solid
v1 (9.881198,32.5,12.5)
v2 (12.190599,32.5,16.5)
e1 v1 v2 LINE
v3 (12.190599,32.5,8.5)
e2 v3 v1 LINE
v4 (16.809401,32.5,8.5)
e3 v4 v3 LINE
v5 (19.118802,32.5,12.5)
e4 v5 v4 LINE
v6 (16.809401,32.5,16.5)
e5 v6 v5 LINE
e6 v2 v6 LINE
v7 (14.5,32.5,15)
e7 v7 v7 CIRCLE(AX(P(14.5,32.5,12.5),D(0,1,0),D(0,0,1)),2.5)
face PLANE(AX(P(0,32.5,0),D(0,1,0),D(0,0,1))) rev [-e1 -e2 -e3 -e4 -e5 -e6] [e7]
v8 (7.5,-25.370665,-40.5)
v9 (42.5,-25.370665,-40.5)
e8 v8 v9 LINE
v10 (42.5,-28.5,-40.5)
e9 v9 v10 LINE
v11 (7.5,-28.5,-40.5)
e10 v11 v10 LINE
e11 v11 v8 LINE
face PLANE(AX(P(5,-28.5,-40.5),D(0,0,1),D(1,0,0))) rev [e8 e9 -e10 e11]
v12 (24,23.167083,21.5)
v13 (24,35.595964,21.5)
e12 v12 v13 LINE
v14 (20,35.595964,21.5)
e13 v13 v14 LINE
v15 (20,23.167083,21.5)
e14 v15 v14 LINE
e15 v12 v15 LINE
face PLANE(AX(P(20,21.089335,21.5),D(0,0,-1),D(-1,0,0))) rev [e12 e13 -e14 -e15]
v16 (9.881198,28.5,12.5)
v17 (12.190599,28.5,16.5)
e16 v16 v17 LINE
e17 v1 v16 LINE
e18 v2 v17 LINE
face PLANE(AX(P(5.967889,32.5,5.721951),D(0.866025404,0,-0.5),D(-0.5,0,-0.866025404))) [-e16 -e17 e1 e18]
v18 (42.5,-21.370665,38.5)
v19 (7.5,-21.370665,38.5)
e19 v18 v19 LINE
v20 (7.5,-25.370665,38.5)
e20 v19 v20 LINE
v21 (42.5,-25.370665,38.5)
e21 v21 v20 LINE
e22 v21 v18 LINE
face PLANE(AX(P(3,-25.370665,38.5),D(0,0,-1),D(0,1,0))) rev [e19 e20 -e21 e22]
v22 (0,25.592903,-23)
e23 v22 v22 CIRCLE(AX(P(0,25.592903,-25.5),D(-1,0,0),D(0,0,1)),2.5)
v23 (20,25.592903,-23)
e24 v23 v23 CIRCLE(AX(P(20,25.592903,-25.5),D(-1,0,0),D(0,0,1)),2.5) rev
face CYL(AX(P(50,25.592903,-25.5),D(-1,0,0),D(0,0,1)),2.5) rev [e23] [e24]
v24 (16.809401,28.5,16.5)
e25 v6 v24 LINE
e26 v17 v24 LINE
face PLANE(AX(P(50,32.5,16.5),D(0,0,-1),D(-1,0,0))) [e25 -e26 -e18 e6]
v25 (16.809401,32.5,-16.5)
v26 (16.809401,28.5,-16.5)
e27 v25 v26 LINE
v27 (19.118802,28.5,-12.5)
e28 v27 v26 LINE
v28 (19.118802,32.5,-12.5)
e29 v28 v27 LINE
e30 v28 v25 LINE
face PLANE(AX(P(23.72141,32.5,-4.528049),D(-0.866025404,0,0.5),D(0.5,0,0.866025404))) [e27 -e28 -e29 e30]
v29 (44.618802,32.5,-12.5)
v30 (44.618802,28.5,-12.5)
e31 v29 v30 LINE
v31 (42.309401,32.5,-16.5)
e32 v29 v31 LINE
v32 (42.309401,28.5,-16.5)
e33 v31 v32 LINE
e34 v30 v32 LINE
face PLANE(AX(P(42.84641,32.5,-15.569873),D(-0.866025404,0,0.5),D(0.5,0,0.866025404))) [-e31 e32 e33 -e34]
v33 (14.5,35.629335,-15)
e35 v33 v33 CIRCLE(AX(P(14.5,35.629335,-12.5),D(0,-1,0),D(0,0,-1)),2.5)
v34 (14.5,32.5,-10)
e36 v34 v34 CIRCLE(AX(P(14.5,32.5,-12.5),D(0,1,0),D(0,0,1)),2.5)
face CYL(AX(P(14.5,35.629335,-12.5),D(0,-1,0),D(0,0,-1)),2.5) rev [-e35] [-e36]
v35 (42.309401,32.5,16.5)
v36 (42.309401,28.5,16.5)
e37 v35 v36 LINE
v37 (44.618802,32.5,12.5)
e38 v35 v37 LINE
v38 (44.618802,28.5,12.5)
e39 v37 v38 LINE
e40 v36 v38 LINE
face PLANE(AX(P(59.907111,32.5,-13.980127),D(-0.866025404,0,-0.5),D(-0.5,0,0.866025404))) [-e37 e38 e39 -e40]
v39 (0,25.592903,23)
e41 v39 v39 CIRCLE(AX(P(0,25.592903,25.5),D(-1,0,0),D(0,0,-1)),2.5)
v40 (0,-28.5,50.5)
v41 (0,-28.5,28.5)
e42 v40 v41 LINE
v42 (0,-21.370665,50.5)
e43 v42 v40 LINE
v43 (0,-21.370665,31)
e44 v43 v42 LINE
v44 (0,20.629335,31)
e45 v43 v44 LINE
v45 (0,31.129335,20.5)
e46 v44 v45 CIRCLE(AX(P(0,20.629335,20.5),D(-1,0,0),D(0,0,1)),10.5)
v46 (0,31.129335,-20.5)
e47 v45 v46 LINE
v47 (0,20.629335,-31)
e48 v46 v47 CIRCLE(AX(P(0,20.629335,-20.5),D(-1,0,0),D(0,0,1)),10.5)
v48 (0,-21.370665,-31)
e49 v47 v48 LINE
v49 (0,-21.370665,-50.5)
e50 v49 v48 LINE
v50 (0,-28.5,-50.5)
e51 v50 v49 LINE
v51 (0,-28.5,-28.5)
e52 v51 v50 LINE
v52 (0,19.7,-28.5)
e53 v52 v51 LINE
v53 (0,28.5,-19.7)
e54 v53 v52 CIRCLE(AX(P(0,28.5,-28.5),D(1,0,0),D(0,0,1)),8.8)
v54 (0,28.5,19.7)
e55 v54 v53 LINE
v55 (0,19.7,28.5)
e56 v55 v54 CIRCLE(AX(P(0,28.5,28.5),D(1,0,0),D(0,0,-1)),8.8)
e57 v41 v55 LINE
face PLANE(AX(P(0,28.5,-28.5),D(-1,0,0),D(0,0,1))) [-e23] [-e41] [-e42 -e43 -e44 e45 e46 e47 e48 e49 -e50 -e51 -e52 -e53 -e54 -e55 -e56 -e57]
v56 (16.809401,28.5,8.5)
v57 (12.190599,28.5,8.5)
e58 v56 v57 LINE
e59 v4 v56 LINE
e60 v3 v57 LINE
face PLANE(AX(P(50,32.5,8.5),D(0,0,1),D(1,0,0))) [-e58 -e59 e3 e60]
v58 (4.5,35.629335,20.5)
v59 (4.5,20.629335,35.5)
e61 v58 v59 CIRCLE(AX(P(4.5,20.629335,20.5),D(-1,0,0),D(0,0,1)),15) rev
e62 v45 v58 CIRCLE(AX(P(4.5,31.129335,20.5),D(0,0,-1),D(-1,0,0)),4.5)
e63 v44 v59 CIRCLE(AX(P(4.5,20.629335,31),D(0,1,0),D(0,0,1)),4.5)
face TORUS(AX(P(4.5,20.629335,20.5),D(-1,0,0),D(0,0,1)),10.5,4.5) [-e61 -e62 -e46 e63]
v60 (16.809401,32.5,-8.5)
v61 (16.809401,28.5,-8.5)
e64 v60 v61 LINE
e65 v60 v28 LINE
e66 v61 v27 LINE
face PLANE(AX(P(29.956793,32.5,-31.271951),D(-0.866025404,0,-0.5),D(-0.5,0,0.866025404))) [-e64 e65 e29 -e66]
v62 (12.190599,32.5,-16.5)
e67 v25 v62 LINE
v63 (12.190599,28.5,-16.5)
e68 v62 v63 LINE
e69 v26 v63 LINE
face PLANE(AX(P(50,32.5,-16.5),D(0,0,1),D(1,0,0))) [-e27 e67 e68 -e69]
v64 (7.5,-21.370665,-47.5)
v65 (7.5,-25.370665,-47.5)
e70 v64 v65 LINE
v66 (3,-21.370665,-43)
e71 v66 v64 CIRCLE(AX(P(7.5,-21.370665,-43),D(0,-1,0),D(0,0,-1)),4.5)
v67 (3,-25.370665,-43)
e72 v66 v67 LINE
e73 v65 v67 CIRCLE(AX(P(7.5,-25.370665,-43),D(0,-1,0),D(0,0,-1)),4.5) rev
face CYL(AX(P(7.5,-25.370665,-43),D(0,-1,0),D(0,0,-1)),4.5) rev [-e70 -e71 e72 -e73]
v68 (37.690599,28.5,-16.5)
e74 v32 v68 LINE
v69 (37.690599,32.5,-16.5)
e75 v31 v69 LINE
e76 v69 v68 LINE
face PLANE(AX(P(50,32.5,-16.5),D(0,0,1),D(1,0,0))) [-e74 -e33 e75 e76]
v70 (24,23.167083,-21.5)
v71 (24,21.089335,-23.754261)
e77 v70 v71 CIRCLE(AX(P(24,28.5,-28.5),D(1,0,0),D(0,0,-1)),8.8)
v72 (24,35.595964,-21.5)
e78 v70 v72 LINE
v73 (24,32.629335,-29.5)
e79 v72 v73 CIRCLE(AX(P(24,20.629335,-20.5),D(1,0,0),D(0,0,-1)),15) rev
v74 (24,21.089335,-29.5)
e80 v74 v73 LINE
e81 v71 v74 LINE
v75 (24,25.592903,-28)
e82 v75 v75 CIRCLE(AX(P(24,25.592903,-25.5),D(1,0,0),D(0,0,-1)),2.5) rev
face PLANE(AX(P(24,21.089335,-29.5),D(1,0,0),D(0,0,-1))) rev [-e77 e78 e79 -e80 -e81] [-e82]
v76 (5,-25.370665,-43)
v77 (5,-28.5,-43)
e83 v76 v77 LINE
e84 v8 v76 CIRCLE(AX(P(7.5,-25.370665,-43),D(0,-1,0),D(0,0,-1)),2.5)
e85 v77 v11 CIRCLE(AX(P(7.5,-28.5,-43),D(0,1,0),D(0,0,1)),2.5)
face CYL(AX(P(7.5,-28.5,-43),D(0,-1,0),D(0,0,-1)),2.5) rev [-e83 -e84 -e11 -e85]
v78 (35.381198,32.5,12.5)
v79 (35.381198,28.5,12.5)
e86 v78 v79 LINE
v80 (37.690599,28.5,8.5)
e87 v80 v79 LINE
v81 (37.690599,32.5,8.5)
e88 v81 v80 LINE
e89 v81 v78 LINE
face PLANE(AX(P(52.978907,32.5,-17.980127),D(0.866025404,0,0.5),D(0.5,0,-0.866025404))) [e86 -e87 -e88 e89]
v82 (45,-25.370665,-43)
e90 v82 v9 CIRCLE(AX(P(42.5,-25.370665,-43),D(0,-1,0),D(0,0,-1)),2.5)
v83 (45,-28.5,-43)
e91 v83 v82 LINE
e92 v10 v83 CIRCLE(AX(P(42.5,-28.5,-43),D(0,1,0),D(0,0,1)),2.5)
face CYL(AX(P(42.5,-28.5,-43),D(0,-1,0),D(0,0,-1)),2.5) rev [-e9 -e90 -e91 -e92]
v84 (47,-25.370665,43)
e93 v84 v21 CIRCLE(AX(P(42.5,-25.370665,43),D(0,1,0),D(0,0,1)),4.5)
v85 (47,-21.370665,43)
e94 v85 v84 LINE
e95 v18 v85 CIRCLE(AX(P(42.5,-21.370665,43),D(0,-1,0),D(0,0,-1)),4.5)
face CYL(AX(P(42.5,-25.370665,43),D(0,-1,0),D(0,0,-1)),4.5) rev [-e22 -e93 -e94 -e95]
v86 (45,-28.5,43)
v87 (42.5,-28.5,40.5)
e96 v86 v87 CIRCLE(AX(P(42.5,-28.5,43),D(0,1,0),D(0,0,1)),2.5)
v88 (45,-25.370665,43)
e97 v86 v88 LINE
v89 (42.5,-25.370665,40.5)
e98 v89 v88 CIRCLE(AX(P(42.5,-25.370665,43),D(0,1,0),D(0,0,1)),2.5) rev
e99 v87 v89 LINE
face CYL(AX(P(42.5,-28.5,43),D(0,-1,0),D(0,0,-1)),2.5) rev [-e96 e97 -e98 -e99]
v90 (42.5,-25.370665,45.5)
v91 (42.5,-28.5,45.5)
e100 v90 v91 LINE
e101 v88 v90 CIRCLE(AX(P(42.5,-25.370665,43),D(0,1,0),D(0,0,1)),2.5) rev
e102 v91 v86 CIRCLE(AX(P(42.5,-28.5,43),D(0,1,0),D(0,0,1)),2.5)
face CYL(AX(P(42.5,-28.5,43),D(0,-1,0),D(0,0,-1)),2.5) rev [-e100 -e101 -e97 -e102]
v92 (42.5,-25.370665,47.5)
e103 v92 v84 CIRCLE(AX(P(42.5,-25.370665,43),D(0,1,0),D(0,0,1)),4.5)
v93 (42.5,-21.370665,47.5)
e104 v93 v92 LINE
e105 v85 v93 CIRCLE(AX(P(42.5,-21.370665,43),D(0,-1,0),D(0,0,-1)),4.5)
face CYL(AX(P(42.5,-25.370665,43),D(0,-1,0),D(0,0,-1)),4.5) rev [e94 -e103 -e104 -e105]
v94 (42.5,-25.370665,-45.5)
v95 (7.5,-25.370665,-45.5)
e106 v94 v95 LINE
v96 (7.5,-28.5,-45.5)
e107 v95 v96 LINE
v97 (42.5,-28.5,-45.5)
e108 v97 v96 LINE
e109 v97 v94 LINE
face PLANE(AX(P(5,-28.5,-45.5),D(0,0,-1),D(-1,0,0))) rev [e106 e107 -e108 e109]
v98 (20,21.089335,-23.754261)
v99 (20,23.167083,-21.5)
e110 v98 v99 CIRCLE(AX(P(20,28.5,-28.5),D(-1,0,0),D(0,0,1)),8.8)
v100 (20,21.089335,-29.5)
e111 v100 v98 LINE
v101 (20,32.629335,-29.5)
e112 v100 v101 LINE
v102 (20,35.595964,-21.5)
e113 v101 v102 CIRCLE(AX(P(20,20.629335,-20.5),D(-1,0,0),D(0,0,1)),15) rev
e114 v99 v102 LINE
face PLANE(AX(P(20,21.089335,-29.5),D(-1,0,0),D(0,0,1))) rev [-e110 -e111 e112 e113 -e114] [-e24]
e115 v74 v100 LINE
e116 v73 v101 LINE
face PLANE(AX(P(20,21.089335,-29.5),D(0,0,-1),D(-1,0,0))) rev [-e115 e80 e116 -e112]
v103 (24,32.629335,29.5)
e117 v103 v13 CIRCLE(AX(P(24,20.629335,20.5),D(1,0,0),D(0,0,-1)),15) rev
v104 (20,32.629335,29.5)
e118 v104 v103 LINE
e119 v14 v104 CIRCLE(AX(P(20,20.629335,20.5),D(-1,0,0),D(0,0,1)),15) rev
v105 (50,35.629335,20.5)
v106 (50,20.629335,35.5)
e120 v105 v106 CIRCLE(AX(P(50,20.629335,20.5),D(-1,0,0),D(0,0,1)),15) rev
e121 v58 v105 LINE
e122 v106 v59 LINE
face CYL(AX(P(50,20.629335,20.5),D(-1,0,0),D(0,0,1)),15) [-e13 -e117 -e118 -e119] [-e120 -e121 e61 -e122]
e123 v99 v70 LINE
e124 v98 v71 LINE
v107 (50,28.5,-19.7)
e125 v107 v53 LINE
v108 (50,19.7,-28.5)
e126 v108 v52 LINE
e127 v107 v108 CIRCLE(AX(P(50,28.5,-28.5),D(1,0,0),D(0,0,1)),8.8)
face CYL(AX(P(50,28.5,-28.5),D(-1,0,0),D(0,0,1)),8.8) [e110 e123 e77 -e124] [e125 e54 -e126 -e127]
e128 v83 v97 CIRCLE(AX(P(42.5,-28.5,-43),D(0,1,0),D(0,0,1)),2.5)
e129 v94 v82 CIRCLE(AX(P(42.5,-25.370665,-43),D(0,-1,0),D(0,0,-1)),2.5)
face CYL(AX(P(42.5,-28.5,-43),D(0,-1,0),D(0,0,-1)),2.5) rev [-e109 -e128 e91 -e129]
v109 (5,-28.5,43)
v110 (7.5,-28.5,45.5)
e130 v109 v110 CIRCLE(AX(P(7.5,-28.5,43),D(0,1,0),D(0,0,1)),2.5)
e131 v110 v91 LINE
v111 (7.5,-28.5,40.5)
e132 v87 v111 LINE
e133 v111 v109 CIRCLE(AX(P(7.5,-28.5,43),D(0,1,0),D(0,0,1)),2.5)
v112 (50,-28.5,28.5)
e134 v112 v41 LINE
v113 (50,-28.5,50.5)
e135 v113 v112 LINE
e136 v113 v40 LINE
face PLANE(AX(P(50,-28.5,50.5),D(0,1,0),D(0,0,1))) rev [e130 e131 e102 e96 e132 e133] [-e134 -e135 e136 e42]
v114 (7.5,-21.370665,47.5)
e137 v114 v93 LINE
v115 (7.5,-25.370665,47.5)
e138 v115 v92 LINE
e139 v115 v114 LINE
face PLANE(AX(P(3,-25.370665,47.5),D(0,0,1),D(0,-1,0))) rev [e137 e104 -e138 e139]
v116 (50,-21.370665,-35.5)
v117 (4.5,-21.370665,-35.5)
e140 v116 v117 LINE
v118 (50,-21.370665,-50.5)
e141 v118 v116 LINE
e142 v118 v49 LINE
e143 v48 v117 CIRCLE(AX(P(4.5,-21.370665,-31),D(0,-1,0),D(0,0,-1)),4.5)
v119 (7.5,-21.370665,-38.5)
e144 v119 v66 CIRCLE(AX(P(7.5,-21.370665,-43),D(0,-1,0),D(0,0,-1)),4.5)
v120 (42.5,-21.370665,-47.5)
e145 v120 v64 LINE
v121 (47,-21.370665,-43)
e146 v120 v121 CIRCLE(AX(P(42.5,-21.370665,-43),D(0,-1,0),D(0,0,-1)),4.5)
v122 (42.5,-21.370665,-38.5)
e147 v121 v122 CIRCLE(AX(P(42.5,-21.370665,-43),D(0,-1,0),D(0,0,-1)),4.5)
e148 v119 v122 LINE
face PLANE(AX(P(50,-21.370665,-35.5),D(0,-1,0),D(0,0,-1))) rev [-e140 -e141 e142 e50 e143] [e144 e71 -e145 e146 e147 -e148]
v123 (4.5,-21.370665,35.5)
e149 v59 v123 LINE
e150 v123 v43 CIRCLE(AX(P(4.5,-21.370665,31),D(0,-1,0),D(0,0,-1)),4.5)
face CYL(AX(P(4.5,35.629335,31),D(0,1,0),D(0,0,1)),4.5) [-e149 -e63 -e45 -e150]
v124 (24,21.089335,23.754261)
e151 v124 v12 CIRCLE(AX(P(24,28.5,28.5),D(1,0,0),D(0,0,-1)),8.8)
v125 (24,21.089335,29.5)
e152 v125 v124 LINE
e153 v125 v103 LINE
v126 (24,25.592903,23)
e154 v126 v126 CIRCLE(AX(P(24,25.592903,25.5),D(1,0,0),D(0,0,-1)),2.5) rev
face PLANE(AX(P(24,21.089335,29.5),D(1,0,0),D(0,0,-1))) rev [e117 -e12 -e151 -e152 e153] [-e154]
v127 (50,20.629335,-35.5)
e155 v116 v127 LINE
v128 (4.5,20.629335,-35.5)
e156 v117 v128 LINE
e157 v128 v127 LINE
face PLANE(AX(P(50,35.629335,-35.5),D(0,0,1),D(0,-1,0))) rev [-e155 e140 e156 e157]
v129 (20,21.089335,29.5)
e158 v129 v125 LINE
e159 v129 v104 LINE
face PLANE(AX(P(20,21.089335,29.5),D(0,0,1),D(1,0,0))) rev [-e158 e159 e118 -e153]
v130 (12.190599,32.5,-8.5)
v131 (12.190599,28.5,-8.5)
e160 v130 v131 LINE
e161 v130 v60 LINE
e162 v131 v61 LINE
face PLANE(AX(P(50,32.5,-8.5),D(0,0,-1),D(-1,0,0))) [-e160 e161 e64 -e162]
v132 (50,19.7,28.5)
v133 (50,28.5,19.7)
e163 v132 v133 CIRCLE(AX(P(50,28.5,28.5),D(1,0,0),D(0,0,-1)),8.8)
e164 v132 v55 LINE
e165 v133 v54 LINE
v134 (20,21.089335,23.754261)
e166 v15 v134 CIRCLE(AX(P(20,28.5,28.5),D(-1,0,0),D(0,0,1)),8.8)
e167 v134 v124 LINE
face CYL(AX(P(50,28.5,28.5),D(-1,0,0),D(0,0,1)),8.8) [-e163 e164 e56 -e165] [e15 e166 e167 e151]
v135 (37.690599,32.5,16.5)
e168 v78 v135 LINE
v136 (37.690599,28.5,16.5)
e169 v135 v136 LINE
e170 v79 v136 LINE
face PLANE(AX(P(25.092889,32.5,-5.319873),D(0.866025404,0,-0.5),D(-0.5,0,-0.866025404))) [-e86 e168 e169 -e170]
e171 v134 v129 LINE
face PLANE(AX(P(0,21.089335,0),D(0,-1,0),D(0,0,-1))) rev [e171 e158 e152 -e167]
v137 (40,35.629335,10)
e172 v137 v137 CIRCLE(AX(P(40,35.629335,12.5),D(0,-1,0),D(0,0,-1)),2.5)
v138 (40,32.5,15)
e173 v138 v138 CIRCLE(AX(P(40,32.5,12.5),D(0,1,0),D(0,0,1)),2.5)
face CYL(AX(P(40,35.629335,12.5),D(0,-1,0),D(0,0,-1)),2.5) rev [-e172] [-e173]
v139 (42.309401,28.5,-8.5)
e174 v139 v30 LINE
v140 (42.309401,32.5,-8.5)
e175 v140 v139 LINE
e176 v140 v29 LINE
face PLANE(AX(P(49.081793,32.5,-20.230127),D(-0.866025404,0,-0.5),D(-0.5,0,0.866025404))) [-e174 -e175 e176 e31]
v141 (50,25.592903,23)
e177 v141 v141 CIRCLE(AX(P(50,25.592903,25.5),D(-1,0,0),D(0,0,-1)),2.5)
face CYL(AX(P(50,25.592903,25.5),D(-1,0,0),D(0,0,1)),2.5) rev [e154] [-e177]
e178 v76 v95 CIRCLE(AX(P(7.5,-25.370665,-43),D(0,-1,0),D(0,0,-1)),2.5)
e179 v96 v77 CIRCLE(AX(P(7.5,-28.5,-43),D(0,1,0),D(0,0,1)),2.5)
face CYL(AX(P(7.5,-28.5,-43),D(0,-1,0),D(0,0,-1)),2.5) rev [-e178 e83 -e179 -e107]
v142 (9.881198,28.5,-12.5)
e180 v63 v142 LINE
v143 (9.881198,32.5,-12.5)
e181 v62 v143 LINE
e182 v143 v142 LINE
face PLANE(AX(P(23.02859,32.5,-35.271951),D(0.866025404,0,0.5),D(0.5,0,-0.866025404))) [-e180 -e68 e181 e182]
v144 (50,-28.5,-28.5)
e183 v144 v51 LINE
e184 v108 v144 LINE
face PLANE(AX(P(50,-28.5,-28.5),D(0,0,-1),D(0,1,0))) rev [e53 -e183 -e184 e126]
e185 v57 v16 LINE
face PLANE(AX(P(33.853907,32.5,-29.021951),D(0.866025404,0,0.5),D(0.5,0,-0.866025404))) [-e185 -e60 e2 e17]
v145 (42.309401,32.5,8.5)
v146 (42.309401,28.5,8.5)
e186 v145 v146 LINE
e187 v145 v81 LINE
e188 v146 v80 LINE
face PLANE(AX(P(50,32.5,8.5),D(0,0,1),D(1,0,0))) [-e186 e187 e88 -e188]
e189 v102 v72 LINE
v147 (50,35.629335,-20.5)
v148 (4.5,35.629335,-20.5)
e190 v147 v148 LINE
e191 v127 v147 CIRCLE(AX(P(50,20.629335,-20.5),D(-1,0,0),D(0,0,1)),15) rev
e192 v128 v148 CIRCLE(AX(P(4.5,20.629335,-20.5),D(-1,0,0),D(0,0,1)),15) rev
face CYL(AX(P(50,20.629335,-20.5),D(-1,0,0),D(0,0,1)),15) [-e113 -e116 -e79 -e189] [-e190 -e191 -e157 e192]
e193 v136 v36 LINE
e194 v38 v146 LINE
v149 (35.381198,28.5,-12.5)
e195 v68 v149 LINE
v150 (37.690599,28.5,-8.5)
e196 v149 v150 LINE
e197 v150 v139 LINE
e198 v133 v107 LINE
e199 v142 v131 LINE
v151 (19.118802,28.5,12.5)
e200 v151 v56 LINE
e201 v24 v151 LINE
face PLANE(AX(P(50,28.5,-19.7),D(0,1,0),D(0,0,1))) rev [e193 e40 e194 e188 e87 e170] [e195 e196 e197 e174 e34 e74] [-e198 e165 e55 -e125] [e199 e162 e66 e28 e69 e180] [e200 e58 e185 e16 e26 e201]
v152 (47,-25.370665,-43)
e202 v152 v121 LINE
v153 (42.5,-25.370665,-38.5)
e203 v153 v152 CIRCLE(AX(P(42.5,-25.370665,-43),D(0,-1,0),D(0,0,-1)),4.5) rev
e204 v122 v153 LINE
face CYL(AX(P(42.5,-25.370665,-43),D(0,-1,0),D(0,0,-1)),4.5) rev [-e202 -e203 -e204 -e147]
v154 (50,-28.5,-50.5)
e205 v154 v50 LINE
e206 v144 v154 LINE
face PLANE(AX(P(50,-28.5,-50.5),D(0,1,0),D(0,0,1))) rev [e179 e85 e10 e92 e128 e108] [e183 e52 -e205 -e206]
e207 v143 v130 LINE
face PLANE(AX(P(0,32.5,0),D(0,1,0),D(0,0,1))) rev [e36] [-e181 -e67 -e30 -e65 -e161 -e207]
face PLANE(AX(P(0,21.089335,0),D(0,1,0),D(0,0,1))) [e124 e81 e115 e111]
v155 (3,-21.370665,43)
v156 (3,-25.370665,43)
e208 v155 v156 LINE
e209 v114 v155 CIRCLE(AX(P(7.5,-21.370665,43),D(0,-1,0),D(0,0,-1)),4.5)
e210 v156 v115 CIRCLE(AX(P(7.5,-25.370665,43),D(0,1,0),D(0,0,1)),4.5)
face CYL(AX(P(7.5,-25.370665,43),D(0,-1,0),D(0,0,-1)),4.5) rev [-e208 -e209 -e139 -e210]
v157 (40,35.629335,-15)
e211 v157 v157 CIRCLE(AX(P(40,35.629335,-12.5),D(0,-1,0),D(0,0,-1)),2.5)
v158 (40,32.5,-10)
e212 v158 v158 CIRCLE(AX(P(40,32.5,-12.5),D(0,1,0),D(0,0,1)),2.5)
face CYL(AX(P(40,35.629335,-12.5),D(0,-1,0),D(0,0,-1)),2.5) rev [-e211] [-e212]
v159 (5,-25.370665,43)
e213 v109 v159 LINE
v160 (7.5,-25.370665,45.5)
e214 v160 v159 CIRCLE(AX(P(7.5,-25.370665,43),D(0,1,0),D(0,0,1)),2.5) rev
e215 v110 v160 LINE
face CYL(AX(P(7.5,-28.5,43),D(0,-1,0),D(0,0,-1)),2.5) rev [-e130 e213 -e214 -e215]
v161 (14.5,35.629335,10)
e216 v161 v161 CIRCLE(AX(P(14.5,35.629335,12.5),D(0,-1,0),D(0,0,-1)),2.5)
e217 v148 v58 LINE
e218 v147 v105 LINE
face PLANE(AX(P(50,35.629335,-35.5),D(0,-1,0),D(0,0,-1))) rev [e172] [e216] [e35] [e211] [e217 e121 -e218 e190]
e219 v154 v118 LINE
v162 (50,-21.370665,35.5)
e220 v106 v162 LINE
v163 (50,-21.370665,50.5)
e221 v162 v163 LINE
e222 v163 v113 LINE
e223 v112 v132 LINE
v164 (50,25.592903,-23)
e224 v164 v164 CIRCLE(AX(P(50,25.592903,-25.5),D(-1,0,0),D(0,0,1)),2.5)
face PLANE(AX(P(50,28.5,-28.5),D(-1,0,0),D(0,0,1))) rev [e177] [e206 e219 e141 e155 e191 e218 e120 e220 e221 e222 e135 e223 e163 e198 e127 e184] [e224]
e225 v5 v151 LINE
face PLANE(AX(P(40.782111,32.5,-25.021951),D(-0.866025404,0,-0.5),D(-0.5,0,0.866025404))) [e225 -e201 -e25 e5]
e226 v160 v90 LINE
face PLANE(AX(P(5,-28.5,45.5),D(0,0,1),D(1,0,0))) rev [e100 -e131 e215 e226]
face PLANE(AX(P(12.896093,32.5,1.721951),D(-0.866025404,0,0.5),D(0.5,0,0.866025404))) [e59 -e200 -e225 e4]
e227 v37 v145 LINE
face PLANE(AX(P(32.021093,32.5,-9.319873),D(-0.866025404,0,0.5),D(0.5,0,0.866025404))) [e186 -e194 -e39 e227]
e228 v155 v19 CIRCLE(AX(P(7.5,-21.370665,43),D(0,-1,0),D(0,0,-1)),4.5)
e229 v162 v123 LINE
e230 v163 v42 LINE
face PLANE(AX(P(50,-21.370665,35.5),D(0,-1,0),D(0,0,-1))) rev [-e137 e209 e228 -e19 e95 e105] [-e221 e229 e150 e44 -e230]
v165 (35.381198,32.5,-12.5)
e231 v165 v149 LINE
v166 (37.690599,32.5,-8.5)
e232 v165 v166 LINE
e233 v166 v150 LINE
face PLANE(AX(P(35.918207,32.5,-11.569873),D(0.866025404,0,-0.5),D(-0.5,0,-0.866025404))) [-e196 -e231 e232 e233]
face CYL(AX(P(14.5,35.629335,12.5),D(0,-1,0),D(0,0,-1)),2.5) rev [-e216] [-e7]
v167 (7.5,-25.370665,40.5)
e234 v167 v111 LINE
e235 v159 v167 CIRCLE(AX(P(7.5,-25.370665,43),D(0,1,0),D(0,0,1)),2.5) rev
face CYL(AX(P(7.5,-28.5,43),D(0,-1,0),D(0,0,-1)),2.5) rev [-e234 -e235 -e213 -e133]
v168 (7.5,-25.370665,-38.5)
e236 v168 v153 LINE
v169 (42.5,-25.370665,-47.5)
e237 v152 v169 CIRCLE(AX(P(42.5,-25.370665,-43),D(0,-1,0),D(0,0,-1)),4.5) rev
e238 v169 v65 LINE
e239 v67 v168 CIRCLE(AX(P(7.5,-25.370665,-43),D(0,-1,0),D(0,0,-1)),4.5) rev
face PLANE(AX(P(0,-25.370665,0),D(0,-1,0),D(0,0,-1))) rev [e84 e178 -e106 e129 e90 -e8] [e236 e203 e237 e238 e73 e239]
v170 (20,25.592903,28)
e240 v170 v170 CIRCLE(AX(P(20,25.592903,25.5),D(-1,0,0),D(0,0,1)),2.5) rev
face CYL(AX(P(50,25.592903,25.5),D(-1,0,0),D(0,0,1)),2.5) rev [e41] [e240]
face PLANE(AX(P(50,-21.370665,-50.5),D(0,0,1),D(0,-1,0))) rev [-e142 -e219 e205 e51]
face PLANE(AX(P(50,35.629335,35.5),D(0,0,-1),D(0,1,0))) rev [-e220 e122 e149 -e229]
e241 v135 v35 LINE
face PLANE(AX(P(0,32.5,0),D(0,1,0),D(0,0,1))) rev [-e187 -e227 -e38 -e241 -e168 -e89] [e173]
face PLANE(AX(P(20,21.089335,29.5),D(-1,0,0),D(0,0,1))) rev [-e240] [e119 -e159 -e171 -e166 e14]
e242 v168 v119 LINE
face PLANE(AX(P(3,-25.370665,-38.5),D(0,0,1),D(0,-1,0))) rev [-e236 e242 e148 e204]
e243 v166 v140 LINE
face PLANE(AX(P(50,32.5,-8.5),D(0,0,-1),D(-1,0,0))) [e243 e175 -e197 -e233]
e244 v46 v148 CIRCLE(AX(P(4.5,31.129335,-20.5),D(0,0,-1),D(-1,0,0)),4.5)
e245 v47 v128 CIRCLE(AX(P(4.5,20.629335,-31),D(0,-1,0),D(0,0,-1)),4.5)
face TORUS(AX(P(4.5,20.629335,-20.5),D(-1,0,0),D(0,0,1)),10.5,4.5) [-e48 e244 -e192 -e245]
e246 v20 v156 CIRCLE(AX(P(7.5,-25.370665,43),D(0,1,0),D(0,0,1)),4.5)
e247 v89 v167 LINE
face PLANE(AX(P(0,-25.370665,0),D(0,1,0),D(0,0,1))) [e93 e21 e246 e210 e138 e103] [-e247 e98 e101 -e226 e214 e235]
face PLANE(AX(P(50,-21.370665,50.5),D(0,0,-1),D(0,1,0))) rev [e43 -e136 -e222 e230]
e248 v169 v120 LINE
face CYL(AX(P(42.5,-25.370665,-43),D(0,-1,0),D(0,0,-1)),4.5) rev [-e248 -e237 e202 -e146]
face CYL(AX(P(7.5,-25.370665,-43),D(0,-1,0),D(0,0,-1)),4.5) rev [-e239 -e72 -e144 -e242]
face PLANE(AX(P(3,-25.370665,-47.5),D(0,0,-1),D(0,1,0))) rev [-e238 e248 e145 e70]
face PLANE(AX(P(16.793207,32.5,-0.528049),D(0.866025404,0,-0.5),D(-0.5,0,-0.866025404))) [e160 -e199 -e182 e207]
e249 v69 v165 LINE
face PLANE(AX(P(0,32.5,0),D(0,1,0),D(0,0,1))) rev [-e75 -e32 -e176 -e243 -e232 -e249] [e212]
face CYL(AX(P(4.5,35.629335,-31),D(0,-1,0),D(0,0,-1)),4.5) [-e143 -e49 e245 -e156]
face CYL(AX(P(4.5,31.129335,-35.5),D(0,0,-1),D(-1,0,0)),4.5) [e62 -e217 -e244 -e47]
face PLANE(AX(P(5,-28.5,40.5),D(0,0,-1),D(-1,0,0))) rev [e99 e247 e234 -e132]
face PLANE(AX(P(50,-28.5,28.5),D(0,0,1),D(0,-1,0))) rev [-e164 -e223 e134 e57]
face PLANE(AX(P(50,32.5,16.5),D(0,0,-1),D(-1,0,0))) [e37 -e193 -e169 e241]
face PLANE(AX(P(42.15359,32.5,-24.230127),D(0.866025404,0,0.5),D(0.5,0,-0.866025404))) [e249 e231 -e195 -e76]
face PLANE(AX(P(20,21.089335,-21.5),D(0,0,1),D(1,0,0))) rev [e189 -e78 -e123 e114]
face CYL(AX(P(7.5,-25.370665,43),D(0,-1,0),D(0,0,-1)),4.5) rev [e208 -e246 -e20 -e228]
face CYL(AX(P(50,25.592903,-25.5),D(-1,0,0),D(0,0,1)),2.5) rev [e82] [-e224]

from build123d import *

# Parameters (mm, degrees)
BOSS_EXTRUDE1_DEPTH = 50
SKETCH2_R           = 2.5
CUT_EXTRUDE1_DEPTH  = 50
FILLET1_R           = 15
SKETCH3_W           = 4
SKETCH3_H           = 8
CUT_EXTRUDE2_DEPTH  = 14.54
SKETCH4_W           = 44
SKETCH4_H           = 9
CUT_EXTRUDE3_DEPTH  = 4
SKETCH5_W           = 40
SKETCH5_H           = 5
CUT_EXTRUDE4_DEPTH  = 94.654951818
FILLET2_R           = 2.5
FILLET3_R           = 4.5
FILLET4_R           = 4.5
CUT_EXTRUDE5_START  = -7.129335
SKETCH6_R           = 2.5
CUT_EXTRUDE5_DEPTH  = 4
SKETCH8_R           = 2.5
CUT_EXTRUDE6_DEPTH  = 92.100219539


with BuildPart() as part:
    # Sketch1 → Boss-Extrude1 (new body)
    with BuildSketch(Plane(origin=(0, 0, 0), x_dir=(0, 0, -1), z_dir=(1, 0, 0))):
        with BuildLine():
            Line((35.5, 35.62933491), (-35.5, 35.62933491))
            Line((-35.5, 35.62933491), (-35.5, -21.37066509))
            Line((-35.5, -21.37066509), (-50.5, -21.37066509))
            Line((-50.5, -21.37066509), (-50.5, -28.5))
            Line((-50.5, -28.5), (-28.5, -28.5))
            Line((-28.5, -28.5), (-28.5, 19.7))
            ThreePointArc((-28.5, 19.7), (-22.277460326, 22.277460326), (-19.7, 28.5))
            Line((-19.7, 28.5), (19.7, 28.5))
            ThreePointArc((19.7, 28.5), (22.277460326, 22.277460326), (28.5, 19.7))
            Line((28.5, 19.7), (28.5, -28.5))
            Line((28.5, -28.5), (50.5, -28.5))
            Line((50.5, -28.5), (50.5, -21.37066509))
            Line((50.5, -21.37066509), (35.5, -21.37066509))
            Line((35.5, -21.37066509), (35.5, 35.62933491))
        make_face()
    extrude(amount=BOSS_EXTRUDE1_DEPTH)

    # Sketch2 → Cut-Extrude1 (cut)
    with BuildSketch(Plane.ZY):
        with Locations((-25.5, 25.592902541)):
            Circle(SKETCH2_R)
        with Locations(Location((25.5, 25.592902541, 0), (0, 0, 180))):
            Circle(SKETCH2_R)
    extrude(amount=-CUT_EXTRUDE1_DEPTH, mode=Mode.SUBTRACT)

    # Fillet1
    fillet1_edges = [part.edges().sort_by_distance(p)[0] for p in [
        (25, 35.62933491, 35.5),
        (25, 35.62933491, -35.5),
    ]]
    fillet(fillet1_edges, radius=FILLET1_R)

    # Sketch3 → Cut-Extrude2 (cut)
    with BuildSketch(Plane(origin=(0, 35.62933491, 0), x_dir=(1, 0, 0), z_dir=(0, 1, 0))):
        with Locations((22, 25.5)):
            Rectangle(SKETCH3_W, SKETCH3_H)
        with Locations((22, -25.5)):
            Rectangle(SKETCH3_W, SKETCH3_H)
    extrude(amount=-CUT_EXTRUDE2_DEPTH, mode=Mode.SUBTRACT)

    # Sketch4 → Cut-Extrude3 (cut)
    with BuildSketch(Plane(origin=(0, -21.37066509, 0), x_dir=(1, 0, 0), z_dir=(0, 1, 0))):
        with Locations((25, -43)):
            Rectangle(SKETCH4_W, SKETCH4_H)
        with Locations((25, 43)):
            Rectangle(SKETCH4_W, SKETCH4_H)
    extrude(amount=-CUT_EXTRUDE3_DEPTH, mode=Mode.SUBTRACT)

    # Sketch5 → Cut-Extrude4 (cut, through all)
    with BuildSketch(Plane(origin=(0, -25.37066509, 0), x_dir=(1, 0, 0), z_dir=(0, 1, 0))):
        with Locations((25, -43)):
            Rectangle(SKETCH5_W, SKETCH5_H)
        with Locations((25, 43)):
            Rectangle(SKETCH5_W, SKETCH5_H)
    extrude(amount=-CUT_EXTRUDE4_DEPTH, mode=Mode.SUBTRACT)

    # Fillet2
    fillet2_edges = [part.edges().sort_by_distance(p)[0] for p in [
        (45, -26.935332545, 40.5),
        (45, -26.935332545, 45.5),
        (5, -26.935332545, 45.5),
        (5, -26.935332545, 40.5),
        (5, -26.935332545, -45.5),
        (5, -26.935332545, -40.5),
        (45, -26.935332545, -45.5),
        (45, -26.935332545, -40.5),
    ]]
    fillet(fillet2_edges, radius=FILLET2_R - 0.0001)  # a hair under: the kernel refuses the full size

    # Fillet3
    fillet3_edges = [part.edges().sort_by_distance(p)[0] for p in [
        (3, -23.37066509, 38.5),
        (3, -23.37066509, 47.5),
        (47, -23.37066509, 47.5),
        (47, -23.37066509, 38.5),
        (47, -23.37066509, -47.5),
        (47, -23.37066509, -38.5),
        (3, -23.37066509, -47.5),
        (3, -23.37066509, -38.5),
    ]]
    fillet(fillet3_edges, radius=FILLET3_R - 0.0001)  # a hair under: the kernel refuses the full size

    # Fillet4
    fillet4_edges = [part.edges().sort_by_distance(p)[0] for p in [
        (0, -0.37066509, -35.5),
        (0, -0.37066509, 35.5),
        (0, 35.62933491, 0),
        (0, 31.235936628, -31.106601718),
        (0, 31.235936628, 31.106601718),
    ]]
    fillet(fillet4_edges, radius=FILLET4_R)

    # Sketch6 → Cut-Extrude5 (cut)
    # profile 1 of 4: a face of its own
    with BuildSketch(Plane(origin=(0, 35.62933491, 0), x_dir=(1, 0, 0), z_dir=(0, 1, 0)).offset(CUT_EXTRUDE5_START)):
        Polygon((16.809401077, -8.5), (19.118802154, -12.5), (16.809401077, -16.5), (12.190598923, -16.5), (9.881197846, -12.5), (12.190598923, -8.5), align=None)
        with Locations(Location((14.5, -12.5, 0), (0, 0, 270))):
            Circle(SKETCH6_R, mode=Mode.SUBTRACT)
    # profile 2 of 4: a face of its own
    with BuildSketch(Plane(origin=(0, 35.62933491, 0), x_dir=(1, 0, 0), z_dir=(0, 1, 0)).offset(CUT_EXTRUDE5_START)):
        Polygon((19.118802154, 12.5), (16.809401077, 16.5), (12.190598923, 16.5), (9.881197846, 12.5), (12.190598923, 8.5), (16.809401077, 8.5), align=None)
        with Locations(Location((14.5, 12.5, 0), (0, 0, 270))):
            Circle(SKETCH6_R, mode=Mode.SUBTRACT)
    # profile 3 of 4: a face of its own
    with BuildSketch(Plane(origin=(0, 35.62933491, 0), x_dir=(1, 0, 0), z_dir=(0, 1, 0)).offset(CUT_EXTRUDE5_START)):
        Polygon((42.309401077, -8.5), (37.690598923, -8.5), (35.381197846, -12.5), (37.690598923, -16.5), (42.309401077, -16.5), (44.618802154, -12.5), align=None)
        with Locations(Location((40, -12.5, 0), (0, 0, 270))):
            Circle(SKETCH6_R, mode=Mode.SUBTRACT)
    # profile 4 of 4: a face of its own
    with BuildSketch(Plane(origin=(0, 35.62933491, 0), x_dir=(1, 0, 0), z_dir=(0, 1, 0)).offset(CUT_EXTRUDE5_START)):
        Polygon((37.690598923, 8.5), (35.381197846, 12.5), (37.690598923, 16.5), (42.309401077, 16.5), (44.618802154, 12.5), (42.309401077, 8.5), align=None)
        with Locations(Location((40, 12.5, 0), (0, 0, 270))):
            Circle(SKETCH6_R, mode=Mode.SUBTRACT)
    extrude(amount=CUT_EXTRUDE5_DEPTH, mode=Mode.SUBTRACT)

    # Sketch8 → Cut-Extrude6 (cut, through all)
    with BuildSketch(Plane.XZ.offset(-28.5)):
        with Locations(Location((14.5, -12.5, 0), (0, 0, 270))):
            Circle(SKETCH8_R)
        with Locations(Location((40, 12.5, 0), (0, 0, 270))):
            Circle(SKETCH8_R)
        with Locations(Location((14.5, 12.5, 0), (0, 0, 270))):
            Circle(SKETCH8_R)
        with Locations(Location((40, -12.5, 0), (0, 0, 270))):
            Circle(SKETCH8_R)
    extrude(amount=-CUT_EXTRUDE6_DEPTH, mode=Mode.SUBTRACT)


solid = part.part
